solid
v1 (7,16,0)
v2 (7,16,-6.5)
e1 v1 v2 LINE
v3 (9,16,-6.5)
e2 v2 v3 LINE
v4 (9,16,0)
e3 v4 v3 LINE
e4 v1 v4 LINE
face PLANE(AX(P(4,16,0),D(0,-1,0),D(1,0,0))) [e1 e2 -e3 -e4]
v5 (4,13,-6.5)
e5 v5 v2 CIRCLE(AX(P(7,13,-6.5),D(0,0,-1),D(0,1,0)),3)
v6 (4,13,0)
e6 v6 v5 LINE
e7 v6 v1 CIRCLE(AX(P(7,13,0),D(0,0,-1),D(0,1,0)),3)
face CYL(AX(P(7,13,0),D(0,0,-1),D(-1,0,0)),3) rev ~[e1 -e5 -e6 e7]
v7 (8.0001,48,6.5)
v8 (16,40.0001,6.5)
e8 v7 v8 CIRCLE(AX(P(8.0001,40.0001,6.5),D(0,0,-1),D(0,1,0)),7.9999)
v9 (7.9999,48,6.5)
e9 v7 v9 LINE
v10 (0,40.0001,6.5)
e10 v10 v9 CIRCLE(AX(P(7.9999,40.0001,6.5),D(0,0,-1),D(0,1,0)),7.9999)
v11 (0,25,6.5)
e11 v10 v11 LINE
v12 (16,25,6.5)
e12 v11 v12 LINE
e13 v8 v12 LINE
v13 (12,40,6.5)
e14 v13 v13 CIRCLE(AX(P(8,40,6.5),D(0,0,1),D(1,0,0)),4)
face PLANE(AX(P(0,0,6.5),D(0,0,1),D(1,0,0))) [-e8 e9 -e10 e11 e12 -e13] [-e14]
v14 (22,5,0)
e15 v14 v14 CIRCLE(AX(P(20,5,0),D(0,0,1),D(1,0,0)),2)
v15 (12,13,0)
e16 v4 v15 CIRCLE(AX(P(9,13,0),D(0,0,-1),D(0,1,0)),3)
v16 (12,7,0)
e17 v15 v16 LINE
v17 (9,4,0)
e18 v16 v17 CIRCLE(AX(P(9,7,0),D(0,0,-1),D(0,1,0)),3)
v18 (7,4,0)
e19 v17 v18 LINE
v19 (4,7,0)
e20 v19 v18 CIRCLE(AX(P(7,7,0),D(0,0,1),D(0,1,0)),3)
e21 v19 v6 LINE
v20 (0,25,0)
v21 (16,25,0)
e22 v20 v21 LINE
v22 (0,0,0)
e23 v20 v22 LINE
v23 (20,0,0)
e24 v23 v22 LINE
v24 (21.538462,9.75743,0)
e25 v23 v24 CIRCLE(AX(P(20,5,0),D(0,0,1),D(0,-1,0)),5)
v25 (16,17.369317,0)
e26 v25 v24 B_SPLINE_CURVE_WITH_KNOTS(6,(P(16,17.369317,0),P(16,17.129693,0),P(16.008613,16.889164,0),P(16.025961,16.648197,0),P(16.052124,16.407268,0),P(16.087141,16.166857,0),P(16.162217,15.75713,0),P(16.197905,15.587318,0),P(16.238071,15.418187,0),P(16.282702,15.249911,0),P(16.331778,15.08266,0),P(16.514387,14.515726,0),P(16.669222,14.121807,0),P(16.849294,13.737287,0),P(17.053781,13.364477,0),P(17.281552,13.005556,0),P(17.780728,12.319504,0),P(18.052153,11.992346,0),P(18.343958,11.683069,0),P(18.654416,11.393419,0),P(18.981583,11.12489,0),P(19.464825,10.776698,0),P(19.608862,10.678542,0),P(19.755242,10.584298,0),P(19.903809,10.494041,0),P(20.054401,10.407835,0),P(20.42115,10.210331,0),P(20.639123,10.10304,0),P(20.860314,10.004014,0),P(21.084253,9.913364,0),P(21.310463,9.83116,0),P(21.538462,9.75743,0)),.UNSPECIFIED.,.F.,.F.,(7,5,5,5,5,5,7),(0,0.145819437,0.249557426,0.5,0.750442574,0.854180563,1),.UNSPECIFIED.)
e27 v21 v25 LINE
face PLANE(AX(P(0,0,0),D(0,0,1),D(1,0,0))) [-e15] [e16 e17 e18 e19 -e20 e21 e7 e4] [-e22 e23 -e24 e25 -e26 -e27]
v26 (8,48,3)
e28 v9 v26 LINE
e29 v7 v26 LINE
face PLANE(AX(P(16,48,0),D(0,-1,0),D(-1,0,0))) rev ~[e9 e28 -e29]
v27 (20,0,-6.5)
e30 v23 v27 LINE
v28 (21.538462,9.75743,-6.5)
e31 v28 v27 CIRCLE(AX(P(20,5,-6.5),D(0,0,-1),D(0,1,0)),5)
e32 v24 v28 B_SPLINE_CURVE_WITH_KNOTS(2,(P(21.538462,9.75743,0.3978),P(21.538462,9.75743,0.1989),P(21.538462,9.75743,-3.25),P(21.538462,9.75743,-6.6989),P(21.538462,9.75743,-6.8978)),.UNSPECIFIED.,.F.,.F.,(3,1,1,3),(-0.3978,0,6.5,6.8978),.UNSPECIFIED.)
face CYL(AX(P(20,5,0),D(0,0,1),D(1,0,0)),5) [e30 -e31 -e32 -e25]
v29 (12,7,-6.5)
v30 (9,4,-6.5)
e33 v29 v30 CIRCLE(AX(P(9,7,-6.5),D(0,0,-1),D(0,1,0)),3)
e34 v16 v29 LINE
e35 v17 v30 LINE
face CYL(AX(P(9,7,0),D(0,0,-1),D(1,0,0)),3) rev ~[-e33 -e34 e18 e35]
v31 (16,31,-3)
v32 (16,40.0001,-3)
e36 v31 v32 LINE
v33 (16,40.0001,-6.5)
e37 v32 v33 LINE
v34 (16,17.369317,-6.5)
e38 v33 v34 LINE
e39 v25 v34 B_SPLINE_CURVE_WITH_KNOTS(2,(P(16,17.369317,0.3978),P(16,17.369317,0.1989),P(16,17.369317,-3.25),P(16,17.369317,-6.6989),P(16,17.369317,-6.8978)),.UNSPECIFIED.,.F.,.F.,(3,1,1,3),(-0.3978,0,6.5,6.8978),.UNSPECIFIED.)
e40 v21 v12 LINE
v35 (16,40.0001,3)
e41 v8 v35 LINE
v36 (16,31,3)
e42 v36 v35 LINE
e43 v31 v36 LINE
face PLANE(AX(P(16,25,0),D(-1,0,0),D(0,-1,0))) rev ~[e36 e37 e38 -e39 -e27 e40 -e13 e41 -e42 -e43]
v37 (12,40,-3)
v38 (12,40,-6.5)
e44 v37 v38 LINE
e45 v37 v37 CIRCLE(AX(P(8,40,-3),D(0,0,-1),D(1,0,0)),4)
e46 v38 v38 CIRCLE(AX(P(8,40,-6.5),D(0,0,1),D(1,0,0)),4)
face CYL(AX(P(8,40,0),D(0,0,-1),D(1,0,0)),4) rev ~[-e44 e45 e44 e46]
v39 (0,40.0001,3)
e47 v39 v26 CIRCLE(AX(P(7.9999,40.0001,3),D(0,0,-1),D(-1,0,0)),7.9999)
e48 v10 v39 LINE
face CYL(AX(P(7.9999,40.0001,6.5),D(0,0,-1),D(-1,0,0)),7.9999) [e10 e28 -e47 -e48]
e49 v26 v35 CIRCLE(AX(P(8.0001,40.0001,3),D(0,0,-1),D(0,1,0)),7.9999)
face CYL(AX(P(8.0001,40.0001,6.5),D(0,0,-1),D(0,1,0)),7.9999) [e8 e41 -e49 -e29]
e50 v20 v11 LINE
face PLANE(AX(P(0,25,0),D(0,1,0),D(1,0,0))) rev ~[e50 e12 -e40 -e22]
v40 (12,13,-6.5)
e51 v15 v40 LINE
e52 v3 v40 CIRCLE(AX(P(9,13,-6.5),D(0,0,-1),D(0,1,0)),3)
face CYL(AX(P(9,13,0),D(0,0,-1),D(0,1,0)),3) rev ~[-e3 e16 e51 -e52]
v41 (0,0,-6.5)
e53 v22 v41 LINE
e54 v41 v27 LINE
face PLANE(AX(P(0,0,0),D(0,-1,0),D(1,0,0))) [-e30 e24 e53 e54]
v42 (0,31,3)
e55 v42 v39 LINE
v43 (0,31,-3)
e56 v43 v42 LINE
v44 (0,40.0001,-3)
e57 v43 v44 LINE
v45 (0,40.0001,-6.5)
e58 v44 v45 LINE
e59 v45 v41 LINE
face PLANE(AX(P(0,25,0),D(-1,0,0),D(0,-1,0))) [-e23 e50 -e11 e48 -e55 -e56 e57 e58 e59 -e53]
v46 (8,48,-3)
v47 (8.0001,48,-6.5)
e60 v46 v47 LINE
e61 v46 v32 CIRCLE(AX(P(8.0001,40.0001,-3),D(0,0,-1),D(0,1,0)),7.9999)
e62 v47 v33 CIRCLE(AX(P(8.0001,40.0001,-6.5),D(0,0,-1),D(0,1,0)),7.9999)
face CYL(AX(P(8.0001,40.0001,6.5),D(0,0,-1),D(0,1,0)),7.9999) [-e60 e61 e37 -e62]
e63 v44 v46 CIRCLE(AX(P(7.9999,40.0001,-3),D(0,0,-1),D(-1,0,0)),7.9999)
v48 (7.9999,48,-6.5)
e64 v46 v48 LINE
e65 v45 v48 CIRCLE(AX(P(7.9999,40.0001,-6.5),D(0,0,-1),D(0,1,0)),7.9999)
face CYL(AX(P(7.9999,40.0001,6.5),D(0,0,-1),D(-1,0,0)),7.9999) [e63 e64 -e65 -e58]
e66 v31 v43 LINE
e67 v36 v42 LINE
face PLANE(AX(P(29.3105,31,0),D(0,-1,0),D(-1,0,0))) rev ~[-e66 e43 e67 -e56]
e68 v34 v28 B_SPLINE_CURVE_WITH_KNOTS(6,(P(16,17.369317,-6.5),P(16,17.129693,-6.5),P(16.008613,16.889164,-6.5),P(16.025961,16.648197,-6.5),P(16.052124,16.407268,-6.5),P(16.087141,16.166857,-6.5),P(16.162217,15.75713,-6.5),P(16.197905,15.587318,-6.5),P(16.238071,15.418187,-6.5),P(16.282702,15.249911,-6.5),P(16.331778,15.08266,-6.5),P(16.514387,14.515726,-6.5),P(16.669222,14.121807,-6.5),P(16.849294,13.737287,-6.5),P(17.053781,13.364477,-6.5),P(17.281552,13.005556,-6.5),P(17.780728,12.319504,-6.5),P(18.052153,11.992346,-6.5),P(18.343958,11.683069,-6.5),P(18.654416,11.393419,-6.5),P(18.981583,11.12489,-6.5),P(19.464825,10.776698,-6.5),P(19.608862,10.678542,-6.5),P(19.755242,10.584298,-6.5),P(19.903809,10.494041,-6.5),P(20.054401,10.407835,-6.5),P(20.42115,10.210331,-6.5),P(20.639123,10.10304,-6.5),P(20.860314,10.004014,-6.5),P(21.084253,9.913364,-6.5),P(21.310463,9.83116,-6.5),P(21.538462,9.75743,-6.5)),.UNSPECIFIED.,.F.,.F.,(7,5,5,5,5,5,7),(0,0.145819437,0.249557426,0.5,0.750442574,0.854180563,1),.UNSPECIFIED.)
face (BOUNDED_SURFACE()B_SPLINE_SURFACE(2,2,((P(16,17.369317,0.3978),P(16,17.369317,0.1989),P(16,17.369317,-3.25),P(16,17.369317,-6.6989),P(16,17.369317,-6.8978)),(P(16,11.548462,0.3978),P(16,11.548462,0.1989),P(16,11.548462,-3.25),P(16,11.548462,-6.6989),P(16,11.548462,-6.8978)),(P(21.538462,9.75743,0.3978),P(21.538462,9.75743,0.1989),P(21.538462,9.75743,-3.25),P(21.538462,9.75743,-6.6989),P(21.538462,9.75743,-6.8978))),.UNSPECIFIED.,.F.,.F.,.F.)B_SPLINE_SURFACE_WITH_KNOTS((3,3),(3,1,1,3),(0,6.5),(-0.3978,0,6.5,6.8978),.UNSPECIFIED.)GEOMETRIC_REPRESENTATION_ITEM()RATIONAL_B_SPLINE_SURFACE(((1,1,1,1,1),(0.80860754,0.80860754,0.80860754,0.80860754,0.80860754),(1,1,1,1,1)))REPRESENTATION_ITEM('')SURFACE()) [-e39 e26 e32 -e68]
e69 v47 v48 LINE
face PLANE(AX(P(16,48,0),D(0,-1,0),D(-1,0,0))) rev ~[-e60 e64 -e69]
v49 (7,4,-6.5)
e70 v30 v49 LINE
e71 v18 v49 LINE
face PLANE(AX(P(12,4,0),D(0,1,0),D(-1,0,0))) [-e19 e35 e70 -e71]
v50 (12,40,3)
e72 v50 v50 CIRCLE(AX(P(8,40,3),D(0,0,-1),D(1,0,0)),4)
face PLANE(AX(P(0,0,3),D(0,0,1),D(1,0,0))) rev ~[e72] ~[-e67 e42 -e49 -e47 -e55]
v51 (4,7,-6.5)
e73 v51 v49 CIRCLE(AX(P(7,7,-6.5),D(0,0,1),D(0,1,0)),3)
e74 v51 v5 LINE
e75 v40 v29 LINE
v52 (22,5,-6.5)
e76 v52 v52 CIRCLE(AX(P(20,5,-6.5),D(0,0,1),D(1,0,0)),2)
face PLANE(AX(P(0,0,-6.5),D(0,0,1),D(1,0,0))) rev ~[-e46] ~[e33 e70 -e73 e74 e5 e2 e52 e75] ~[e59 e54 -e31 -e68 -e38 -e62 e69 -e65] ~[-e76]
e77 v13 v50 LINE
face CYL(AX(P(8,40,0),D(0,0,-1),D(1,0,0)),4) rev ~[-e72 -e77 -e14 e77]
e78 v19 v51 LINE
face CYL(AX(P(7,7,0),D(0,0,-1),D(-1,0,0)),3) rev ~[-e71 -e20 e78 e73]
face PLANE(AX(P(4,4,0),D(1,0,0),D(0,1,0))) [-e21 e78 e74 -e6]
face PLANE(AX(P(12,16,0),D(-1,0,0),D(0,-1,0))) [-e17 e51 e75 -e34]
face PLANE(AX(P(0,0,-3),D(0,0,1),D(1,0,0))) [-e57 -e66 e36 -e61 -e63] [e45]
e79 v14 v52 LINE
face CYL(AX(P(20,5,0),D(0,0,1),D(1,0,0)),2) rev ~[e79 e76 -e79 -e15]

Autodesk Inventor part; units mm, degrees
ref_plane "YZ Plane" through (0, 0, 0) normal (1, 0, 0) x (0, 1, 0)
ref_plane "XZ Plane" through (0, 0, 0) normal (0, 1, 0) x (-1, 0, 0)
ref_plane "XY Plane" through (0, 0, 0) normal (0, 0, 1) x (1, 0, 0)
sketch "스케치1" plane through (0, 0, 0) normal (0, 0, 1) x (1, 0, 0)
  line L0 (0, 0) -> (16, 0)
  line L1 (16, 48) -> (0, 48)
  line L2 (0, 48) -> (0, 0)
  line L3 (0, 0) -> (20, 0)
  line L4 (0, 0) -> (20, 0) construction
  circle A0 centre (20, 5) radius 2
  line L5 (20, 10) -> (16, 10)
  circle A1 centre (20, 5) radius 5
  line L6 (16, 48) -> (16, 10)
  circle A2 centre (8, 40) radius 4
  line L7 (4, 16) -> (12, 16)
  line L8 (12, 16) -> (12, 4)
  line L9 (12, 4) -> (4, 4)
  line L10 (4, 4) -> (4, 16)
  line L11 (0, 25) -> (16, 25)
  dimension "d0" = 16
  dimension "d4" = 48
  dimension "d5" = 20
  dimension "d8" = 4
  dimension "d9" = 10
  dimension "d10" = 8
  dimension "d11" = 40
  dimension "d12" = 8
  dimension "d13" = 12
  dimension "d14" = 4
  dimension "d15" = 4
  dimension "d16" = 8
  dimension "d17" = 25
extrude "돌출1" add sketch "스케치1" against normal blind 6.5 contours L2 L11 L6 L5 A1 L3 L0 | A1
extrude "돌출2" add sketch "스케치1" along normal mid plane 13 contours L2 L1 L6 L11
fillet "모깎기1" radius 8 2 edges at (16, 48, 0) (0, 48, 0)
fillet "모깎기2" radius 3 4 edges at (4, 16, -3.25) (12, 16, -3.25) (12, 4, -3.25) (4, 4, -3.25)
fillet "모깎기3" radius 8 1 edges at (16, 10, -3.25)
sketch "스케치2" plane through (0, 0, 0) normal (0, 0, 1) x (1, 0, 0)
  line L0 (-9.7469, 60.6249) -> (29.3105, 60.6249)
  line L1 (29.3105, 60.6249) -> (29.3105, 31)
  line L2 (29.3105, 31) -> (-9.7469, 31)
  line L3 (-9.7469, 31) -> (-9.7469, 60.6249)
  point P0 (0, 0)
  dimension "d25" = 31
extrude "돌출3" cut sketch "스케치2" along normal mid plane 6
properties part number "2번부품"
